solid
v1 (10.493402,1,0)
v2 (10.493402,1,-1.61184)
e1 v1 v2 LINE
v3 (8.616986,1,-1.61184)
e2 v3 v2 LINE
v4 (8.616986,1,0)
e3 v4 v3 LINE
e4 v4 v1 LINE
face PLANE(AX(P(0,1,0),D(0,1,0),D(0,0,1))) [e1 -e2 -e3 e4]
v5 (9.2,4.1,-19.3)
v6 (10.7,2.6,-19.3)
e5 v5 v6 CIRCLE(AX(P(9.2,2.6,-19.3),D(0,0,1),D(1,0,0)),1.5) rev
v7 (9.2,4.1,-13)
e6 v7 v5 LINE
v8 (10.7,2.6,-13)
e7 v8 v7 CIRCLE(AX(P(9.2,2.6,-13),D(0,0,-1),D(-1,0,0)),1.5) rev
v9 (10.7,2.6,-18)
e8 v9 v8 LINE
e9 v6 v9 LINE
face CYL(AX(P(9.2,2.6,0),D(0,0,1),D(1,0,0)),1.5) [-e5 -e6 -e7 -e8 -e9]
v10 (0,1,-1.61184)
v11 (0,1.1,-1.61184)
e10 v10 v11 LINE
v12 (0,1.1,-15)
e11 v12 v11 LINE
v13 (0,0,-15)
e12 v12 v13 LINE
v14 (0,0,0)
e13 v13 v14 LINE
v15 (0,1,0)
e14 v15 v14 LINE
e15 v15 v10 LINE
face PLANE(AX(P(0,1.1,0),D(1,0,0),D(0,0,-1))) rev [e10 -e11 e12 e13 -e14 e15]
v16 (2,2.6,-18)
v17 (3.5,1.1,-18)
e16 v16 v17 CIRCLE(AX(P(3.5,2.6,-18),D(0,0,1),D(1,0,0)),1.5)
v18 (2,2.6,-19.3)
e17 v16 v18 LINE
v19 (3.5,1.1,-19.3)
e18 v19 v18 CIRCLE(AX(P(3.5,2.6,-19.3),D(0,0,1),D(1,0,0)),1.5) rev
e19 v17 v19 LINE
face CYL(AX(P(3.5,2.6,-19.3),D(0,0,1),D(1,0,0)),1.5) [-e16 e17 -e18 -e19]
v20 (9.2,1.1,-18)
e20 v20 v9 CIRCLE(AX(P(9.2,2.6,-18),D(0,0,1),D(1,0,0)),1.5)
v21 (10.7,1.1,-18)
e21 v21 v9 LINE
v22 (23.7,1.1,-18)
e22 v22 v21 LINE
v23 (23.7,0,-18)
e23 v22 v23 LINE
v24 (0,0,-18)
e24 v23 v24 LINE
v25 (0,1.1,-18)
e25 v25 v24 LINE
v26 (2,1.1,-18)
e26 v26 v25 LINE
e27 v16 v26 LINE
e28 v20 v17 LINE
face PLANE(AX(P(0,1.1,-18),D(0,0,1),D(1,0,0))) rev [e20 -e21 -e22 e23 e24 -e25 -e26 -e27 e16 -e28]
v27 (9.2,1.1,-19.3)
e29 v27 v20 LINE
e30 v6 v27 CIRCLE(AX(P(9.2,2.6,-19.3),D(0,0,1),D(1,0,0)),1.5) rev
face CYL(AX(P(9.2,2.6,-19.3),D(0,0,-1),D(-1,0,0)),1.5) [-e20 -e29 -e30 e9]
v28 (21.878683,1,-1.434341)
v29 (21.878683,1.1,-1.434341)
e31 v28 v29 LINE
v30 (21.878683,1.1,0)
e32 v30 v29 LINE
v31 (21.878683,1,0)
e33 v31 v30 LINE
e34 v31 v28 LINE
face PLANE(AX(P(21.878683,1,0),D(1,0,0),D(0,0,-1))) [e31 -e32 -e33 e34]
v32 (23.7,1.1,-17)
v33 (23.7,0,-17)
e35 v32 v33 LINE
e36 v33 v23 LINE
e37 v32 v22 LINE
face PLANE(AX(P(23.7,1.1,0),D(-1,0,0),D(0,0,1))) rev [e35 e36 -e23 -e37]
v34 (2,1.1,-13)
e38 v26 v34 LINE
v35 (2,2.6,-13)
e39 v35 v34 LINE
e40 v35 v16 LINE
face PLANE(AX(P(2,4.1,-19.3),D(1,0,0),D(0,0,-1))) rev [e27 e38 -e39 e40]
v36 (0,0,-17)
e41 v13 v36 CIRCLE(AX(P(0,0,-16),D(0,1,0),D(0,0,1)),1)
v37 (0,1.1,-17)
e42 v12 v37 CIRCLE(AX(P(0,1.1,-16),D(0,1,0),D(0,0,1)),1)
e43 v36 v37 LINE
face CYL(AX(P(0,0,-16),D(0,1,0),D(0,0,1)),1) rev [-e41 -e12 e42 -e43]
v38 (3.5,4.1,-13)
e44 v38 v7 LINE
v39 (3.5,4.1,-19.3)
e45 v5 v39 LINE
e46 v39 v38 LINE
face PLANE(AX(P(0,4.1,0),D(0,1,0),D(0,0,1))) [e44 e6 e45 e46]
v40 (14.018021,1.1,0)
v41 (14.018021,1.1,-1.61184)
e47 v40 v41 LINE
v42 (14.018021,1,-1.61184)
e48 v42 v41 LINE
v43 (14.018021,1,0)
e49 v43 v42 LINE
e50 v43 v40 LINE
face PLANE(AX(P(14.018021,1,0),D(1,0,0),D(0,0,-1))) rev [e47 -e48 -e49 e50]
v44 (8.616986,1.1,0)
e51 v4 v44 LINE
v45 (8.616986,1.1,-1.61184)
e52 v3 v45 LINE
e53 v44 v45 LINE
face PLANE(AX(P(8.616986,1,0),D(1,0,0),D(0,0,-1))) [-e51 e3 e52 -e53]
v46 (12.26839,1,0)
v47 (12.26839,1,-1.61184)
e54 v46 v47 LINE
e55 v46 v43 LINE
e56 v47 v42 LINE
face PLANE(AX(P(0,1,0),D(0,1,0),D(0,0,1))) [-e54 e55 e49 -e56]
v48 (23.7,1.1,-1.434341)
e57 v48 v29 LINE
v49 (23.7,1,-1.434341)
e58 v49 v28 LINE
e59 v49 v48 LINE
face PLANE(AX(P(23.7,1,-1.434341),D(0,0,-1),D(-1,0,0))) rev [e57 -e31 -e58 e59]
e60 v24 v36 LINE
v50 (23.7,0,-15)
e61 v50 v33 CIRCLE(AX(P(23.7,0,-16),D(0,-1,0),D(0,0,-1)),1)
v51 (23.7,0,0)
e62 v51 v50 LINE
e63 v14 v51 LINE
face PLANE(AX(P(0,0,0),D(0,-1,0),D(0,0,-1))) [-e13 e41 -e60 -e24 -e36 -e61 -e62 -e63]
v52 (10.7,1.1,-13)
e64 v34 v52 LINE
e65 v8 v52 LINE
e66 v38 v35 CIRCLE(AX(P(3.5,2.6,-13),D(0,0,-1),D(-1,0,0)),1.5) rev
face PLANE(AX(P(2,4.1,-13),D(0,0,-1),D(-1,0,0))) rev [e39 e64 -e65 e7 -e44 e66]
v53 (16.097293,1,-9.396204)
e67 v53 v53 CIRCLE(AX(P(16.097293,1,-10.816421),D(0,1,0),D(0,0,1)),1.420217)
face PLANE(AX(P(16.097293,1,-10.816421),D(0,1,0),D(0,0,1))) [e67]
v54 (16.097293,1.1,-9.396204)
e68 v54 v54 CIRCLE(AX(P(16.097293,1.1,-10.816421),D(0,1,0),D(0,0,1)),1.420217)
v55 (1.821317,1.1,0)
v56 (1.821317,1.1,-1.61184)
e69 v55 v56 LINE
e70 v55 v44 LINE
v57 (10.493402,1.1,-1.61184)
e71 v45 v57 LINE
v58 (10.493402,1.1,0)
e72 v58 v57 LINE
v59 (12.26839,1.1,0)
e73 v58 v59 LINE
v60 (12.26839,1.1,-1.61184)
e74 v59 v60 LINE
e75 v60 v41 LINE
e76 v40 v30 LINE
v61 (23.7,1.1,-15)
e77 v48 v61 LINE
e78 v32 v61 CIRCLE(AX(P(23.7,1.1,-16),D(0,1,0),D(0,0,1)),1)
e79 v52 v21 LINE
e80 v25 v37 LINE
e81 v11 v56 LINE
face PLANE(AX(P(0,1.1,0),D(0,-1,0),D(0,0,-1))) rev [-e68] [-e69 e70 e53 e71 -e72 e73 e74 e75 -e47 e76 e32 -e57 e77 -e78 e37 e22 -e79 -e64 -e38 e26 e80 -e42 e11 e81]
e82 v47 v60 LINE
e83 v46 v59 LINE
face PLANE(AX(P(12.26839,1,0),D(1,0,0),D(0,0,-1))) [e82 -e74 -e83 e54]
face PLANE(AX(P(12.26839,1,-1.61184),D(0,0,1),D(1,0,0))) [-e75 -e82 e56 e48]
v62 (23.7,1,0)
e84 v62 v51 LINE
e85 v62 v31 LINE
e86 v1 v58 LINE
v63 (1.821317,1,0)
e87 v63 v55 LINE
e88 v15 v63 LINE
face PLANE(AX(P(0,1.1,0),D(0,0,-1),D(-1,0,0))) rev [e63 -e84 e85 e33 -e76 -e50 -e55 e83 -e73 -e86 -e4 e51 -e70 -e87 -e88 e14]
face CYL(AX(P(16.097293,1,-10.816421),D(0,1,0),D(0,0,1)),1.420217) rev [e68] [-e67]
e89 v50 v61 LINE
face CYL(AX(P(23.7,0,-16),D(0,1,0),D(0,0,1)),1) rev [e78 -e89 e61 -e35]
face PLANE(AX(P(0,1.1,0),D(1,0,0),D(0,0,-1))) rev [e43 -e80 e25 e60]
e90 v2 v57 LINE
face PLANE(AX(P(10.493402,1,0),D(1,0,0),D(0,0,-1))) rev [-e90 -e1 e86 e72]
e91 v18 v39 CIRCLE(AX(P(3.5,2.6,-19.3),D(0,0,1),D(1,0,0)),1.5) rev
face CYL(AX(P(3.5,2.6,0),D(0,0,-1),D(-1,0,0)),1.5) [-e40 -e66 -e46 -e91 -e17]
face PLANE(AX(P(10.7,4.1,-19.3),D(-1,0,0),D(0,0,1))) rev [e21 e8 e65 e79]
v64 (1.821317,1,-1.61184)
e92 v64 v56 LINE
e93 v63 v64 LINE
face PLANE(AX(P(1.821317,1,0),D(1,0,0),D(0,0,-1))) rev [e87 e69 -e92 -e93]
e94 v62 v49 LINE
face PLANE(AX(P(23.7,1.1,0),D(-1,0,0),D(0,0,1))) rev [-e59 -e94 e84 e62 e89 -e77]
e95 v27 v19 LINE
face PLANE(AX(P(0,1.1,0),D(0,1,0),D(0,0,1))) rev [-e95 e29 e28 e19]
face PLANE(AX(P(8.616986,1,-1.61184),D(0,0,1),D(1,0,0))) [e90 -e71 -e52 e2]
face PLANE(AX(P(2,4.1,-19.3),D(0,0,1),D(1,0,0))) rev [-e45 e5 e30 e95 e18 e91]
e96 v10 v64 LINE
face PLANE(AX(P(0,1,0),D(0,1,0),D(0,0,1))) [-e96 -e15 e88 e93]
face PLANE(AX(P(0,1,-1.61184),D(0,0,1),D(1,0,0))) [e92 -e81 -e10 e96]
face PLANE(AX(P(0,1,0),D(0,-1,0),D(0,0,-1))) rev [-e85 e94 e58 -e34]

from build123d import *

# Parameters (mm, degrees)
ESBO_O1_W                = 23.7
ESBO_O1_H                = 18
RESSALTO_EXTRUS_O1_DEPTH = 1.1
ESBO_O2_W                = 8.7
ESBO_O2_H                = 6.3
RESSALTO_EXTRUS_O2_DEPTH = 3
FILETE1_R                = 1.5
ESBO_O3_R                = 1.420216844
ESBO_O3_W                = 1.821317375
ESBO_O3_H                = 1.611839717
ESBO_O3_W_2              = 1.876415965
ESBO_O3_W_3              = 1.749631103
ESBO_O3_H_2              = 1.434340909
CORTE_EXTRUS_O1_DEPTH    = 0.1
ESBO_O4_R                = 1
CORTE_EXTRUS_O2_DEPTH    = 31.711235729


with BuildPart() as part:
    # Esboço1 → Ressalto-extrusão1 (new body)
    with BuildSketch(Plane(origin=(0, 0, 0), x_dir=(1, 0, 0), z_dir=(0, 1, 0))):
        with Locations((11.85, 9)):
            Rectangle(ESBO_O1_W, ESBO_O1_H)
    extrude(amount=RESSALTO_EXTRUS_O1_DEPTH)

    # Esboço2 → Ressalto-extrusão2 (add)
    with BuildSketch(Plane(origin=(0, 1.1, 0), x_dir=(1, 0, 0), z_dir=(0, 1, 0))):
        with Locations((6.35, 16.15)):
            Rectangle(ESBO_O2_W, ESBO_O2_H)
    extrude(amount=RESSALTO_EXTRUS_O2_DEPTH)

    # Filete1
    filete1_edges = [part.edges().sort_by_distance(p)[0] for p in [
        (10.7, 1.1, -18.65),
        (2, 1.1, -18.65),
        (10.7, 4.1, -16.15),
        (2, 4.1, -16.15),
    ]]
    fillet(filete1_edges, radius=FILETE1_R - 0.0001)  # a hair under: the kernel refuses the full size

    # Esboço3 → Corte-extrusão1 (cut)
    with BuildSketch(Plane(origin=(0, 1.1, 0), x_dir=(1, 0, 0), z_dir=(0, 1, 0))):
        with Locations(Location((16.097292894, 10.816420735, 0), (0, 0, 270))):
            Circle(ESBO_O3_R)
        with Locations((0.910658688, 0.805919859)):
            Rectangle(ESBO_O3_W, ESBO_O3_H)
        with Locations((9.555193989, 0.805919859)):
            Rectangle(ESBO_O3_W_2, ESBO_O3_H)
        with Locations((13.143205597, 0.805919859)):
            Rectangle(ESBO_O3_W_3, ESBO_O3_H)
        with Locations((22.789341312, 0.717170455)):
            Rectangle(ESBO_O3_W, ESBO_O3_H_2)
    extrude(amount=-CORTE_EXTRUS_O1_DEPTH, mode=Mode.SUBTRACT)

    # Esboço4 → Corte-extrusão2 (cut, through all)
    with BuildSketch(Plane(origin=(0, 1.1, 0), x_dir=(1, 0, 0), z_dir=(0, 1, 0))):
        with Locations((0, 16)):
            Circle(ESBO_O4_R)
        with Locations((23.7, 16)):
            Circle(ESBO_O4_R)
    extrude(amount=-CORTE_EXTRUS_O2_DEPTH, mode=Mode.SUBTRACT)


solid = part.part
